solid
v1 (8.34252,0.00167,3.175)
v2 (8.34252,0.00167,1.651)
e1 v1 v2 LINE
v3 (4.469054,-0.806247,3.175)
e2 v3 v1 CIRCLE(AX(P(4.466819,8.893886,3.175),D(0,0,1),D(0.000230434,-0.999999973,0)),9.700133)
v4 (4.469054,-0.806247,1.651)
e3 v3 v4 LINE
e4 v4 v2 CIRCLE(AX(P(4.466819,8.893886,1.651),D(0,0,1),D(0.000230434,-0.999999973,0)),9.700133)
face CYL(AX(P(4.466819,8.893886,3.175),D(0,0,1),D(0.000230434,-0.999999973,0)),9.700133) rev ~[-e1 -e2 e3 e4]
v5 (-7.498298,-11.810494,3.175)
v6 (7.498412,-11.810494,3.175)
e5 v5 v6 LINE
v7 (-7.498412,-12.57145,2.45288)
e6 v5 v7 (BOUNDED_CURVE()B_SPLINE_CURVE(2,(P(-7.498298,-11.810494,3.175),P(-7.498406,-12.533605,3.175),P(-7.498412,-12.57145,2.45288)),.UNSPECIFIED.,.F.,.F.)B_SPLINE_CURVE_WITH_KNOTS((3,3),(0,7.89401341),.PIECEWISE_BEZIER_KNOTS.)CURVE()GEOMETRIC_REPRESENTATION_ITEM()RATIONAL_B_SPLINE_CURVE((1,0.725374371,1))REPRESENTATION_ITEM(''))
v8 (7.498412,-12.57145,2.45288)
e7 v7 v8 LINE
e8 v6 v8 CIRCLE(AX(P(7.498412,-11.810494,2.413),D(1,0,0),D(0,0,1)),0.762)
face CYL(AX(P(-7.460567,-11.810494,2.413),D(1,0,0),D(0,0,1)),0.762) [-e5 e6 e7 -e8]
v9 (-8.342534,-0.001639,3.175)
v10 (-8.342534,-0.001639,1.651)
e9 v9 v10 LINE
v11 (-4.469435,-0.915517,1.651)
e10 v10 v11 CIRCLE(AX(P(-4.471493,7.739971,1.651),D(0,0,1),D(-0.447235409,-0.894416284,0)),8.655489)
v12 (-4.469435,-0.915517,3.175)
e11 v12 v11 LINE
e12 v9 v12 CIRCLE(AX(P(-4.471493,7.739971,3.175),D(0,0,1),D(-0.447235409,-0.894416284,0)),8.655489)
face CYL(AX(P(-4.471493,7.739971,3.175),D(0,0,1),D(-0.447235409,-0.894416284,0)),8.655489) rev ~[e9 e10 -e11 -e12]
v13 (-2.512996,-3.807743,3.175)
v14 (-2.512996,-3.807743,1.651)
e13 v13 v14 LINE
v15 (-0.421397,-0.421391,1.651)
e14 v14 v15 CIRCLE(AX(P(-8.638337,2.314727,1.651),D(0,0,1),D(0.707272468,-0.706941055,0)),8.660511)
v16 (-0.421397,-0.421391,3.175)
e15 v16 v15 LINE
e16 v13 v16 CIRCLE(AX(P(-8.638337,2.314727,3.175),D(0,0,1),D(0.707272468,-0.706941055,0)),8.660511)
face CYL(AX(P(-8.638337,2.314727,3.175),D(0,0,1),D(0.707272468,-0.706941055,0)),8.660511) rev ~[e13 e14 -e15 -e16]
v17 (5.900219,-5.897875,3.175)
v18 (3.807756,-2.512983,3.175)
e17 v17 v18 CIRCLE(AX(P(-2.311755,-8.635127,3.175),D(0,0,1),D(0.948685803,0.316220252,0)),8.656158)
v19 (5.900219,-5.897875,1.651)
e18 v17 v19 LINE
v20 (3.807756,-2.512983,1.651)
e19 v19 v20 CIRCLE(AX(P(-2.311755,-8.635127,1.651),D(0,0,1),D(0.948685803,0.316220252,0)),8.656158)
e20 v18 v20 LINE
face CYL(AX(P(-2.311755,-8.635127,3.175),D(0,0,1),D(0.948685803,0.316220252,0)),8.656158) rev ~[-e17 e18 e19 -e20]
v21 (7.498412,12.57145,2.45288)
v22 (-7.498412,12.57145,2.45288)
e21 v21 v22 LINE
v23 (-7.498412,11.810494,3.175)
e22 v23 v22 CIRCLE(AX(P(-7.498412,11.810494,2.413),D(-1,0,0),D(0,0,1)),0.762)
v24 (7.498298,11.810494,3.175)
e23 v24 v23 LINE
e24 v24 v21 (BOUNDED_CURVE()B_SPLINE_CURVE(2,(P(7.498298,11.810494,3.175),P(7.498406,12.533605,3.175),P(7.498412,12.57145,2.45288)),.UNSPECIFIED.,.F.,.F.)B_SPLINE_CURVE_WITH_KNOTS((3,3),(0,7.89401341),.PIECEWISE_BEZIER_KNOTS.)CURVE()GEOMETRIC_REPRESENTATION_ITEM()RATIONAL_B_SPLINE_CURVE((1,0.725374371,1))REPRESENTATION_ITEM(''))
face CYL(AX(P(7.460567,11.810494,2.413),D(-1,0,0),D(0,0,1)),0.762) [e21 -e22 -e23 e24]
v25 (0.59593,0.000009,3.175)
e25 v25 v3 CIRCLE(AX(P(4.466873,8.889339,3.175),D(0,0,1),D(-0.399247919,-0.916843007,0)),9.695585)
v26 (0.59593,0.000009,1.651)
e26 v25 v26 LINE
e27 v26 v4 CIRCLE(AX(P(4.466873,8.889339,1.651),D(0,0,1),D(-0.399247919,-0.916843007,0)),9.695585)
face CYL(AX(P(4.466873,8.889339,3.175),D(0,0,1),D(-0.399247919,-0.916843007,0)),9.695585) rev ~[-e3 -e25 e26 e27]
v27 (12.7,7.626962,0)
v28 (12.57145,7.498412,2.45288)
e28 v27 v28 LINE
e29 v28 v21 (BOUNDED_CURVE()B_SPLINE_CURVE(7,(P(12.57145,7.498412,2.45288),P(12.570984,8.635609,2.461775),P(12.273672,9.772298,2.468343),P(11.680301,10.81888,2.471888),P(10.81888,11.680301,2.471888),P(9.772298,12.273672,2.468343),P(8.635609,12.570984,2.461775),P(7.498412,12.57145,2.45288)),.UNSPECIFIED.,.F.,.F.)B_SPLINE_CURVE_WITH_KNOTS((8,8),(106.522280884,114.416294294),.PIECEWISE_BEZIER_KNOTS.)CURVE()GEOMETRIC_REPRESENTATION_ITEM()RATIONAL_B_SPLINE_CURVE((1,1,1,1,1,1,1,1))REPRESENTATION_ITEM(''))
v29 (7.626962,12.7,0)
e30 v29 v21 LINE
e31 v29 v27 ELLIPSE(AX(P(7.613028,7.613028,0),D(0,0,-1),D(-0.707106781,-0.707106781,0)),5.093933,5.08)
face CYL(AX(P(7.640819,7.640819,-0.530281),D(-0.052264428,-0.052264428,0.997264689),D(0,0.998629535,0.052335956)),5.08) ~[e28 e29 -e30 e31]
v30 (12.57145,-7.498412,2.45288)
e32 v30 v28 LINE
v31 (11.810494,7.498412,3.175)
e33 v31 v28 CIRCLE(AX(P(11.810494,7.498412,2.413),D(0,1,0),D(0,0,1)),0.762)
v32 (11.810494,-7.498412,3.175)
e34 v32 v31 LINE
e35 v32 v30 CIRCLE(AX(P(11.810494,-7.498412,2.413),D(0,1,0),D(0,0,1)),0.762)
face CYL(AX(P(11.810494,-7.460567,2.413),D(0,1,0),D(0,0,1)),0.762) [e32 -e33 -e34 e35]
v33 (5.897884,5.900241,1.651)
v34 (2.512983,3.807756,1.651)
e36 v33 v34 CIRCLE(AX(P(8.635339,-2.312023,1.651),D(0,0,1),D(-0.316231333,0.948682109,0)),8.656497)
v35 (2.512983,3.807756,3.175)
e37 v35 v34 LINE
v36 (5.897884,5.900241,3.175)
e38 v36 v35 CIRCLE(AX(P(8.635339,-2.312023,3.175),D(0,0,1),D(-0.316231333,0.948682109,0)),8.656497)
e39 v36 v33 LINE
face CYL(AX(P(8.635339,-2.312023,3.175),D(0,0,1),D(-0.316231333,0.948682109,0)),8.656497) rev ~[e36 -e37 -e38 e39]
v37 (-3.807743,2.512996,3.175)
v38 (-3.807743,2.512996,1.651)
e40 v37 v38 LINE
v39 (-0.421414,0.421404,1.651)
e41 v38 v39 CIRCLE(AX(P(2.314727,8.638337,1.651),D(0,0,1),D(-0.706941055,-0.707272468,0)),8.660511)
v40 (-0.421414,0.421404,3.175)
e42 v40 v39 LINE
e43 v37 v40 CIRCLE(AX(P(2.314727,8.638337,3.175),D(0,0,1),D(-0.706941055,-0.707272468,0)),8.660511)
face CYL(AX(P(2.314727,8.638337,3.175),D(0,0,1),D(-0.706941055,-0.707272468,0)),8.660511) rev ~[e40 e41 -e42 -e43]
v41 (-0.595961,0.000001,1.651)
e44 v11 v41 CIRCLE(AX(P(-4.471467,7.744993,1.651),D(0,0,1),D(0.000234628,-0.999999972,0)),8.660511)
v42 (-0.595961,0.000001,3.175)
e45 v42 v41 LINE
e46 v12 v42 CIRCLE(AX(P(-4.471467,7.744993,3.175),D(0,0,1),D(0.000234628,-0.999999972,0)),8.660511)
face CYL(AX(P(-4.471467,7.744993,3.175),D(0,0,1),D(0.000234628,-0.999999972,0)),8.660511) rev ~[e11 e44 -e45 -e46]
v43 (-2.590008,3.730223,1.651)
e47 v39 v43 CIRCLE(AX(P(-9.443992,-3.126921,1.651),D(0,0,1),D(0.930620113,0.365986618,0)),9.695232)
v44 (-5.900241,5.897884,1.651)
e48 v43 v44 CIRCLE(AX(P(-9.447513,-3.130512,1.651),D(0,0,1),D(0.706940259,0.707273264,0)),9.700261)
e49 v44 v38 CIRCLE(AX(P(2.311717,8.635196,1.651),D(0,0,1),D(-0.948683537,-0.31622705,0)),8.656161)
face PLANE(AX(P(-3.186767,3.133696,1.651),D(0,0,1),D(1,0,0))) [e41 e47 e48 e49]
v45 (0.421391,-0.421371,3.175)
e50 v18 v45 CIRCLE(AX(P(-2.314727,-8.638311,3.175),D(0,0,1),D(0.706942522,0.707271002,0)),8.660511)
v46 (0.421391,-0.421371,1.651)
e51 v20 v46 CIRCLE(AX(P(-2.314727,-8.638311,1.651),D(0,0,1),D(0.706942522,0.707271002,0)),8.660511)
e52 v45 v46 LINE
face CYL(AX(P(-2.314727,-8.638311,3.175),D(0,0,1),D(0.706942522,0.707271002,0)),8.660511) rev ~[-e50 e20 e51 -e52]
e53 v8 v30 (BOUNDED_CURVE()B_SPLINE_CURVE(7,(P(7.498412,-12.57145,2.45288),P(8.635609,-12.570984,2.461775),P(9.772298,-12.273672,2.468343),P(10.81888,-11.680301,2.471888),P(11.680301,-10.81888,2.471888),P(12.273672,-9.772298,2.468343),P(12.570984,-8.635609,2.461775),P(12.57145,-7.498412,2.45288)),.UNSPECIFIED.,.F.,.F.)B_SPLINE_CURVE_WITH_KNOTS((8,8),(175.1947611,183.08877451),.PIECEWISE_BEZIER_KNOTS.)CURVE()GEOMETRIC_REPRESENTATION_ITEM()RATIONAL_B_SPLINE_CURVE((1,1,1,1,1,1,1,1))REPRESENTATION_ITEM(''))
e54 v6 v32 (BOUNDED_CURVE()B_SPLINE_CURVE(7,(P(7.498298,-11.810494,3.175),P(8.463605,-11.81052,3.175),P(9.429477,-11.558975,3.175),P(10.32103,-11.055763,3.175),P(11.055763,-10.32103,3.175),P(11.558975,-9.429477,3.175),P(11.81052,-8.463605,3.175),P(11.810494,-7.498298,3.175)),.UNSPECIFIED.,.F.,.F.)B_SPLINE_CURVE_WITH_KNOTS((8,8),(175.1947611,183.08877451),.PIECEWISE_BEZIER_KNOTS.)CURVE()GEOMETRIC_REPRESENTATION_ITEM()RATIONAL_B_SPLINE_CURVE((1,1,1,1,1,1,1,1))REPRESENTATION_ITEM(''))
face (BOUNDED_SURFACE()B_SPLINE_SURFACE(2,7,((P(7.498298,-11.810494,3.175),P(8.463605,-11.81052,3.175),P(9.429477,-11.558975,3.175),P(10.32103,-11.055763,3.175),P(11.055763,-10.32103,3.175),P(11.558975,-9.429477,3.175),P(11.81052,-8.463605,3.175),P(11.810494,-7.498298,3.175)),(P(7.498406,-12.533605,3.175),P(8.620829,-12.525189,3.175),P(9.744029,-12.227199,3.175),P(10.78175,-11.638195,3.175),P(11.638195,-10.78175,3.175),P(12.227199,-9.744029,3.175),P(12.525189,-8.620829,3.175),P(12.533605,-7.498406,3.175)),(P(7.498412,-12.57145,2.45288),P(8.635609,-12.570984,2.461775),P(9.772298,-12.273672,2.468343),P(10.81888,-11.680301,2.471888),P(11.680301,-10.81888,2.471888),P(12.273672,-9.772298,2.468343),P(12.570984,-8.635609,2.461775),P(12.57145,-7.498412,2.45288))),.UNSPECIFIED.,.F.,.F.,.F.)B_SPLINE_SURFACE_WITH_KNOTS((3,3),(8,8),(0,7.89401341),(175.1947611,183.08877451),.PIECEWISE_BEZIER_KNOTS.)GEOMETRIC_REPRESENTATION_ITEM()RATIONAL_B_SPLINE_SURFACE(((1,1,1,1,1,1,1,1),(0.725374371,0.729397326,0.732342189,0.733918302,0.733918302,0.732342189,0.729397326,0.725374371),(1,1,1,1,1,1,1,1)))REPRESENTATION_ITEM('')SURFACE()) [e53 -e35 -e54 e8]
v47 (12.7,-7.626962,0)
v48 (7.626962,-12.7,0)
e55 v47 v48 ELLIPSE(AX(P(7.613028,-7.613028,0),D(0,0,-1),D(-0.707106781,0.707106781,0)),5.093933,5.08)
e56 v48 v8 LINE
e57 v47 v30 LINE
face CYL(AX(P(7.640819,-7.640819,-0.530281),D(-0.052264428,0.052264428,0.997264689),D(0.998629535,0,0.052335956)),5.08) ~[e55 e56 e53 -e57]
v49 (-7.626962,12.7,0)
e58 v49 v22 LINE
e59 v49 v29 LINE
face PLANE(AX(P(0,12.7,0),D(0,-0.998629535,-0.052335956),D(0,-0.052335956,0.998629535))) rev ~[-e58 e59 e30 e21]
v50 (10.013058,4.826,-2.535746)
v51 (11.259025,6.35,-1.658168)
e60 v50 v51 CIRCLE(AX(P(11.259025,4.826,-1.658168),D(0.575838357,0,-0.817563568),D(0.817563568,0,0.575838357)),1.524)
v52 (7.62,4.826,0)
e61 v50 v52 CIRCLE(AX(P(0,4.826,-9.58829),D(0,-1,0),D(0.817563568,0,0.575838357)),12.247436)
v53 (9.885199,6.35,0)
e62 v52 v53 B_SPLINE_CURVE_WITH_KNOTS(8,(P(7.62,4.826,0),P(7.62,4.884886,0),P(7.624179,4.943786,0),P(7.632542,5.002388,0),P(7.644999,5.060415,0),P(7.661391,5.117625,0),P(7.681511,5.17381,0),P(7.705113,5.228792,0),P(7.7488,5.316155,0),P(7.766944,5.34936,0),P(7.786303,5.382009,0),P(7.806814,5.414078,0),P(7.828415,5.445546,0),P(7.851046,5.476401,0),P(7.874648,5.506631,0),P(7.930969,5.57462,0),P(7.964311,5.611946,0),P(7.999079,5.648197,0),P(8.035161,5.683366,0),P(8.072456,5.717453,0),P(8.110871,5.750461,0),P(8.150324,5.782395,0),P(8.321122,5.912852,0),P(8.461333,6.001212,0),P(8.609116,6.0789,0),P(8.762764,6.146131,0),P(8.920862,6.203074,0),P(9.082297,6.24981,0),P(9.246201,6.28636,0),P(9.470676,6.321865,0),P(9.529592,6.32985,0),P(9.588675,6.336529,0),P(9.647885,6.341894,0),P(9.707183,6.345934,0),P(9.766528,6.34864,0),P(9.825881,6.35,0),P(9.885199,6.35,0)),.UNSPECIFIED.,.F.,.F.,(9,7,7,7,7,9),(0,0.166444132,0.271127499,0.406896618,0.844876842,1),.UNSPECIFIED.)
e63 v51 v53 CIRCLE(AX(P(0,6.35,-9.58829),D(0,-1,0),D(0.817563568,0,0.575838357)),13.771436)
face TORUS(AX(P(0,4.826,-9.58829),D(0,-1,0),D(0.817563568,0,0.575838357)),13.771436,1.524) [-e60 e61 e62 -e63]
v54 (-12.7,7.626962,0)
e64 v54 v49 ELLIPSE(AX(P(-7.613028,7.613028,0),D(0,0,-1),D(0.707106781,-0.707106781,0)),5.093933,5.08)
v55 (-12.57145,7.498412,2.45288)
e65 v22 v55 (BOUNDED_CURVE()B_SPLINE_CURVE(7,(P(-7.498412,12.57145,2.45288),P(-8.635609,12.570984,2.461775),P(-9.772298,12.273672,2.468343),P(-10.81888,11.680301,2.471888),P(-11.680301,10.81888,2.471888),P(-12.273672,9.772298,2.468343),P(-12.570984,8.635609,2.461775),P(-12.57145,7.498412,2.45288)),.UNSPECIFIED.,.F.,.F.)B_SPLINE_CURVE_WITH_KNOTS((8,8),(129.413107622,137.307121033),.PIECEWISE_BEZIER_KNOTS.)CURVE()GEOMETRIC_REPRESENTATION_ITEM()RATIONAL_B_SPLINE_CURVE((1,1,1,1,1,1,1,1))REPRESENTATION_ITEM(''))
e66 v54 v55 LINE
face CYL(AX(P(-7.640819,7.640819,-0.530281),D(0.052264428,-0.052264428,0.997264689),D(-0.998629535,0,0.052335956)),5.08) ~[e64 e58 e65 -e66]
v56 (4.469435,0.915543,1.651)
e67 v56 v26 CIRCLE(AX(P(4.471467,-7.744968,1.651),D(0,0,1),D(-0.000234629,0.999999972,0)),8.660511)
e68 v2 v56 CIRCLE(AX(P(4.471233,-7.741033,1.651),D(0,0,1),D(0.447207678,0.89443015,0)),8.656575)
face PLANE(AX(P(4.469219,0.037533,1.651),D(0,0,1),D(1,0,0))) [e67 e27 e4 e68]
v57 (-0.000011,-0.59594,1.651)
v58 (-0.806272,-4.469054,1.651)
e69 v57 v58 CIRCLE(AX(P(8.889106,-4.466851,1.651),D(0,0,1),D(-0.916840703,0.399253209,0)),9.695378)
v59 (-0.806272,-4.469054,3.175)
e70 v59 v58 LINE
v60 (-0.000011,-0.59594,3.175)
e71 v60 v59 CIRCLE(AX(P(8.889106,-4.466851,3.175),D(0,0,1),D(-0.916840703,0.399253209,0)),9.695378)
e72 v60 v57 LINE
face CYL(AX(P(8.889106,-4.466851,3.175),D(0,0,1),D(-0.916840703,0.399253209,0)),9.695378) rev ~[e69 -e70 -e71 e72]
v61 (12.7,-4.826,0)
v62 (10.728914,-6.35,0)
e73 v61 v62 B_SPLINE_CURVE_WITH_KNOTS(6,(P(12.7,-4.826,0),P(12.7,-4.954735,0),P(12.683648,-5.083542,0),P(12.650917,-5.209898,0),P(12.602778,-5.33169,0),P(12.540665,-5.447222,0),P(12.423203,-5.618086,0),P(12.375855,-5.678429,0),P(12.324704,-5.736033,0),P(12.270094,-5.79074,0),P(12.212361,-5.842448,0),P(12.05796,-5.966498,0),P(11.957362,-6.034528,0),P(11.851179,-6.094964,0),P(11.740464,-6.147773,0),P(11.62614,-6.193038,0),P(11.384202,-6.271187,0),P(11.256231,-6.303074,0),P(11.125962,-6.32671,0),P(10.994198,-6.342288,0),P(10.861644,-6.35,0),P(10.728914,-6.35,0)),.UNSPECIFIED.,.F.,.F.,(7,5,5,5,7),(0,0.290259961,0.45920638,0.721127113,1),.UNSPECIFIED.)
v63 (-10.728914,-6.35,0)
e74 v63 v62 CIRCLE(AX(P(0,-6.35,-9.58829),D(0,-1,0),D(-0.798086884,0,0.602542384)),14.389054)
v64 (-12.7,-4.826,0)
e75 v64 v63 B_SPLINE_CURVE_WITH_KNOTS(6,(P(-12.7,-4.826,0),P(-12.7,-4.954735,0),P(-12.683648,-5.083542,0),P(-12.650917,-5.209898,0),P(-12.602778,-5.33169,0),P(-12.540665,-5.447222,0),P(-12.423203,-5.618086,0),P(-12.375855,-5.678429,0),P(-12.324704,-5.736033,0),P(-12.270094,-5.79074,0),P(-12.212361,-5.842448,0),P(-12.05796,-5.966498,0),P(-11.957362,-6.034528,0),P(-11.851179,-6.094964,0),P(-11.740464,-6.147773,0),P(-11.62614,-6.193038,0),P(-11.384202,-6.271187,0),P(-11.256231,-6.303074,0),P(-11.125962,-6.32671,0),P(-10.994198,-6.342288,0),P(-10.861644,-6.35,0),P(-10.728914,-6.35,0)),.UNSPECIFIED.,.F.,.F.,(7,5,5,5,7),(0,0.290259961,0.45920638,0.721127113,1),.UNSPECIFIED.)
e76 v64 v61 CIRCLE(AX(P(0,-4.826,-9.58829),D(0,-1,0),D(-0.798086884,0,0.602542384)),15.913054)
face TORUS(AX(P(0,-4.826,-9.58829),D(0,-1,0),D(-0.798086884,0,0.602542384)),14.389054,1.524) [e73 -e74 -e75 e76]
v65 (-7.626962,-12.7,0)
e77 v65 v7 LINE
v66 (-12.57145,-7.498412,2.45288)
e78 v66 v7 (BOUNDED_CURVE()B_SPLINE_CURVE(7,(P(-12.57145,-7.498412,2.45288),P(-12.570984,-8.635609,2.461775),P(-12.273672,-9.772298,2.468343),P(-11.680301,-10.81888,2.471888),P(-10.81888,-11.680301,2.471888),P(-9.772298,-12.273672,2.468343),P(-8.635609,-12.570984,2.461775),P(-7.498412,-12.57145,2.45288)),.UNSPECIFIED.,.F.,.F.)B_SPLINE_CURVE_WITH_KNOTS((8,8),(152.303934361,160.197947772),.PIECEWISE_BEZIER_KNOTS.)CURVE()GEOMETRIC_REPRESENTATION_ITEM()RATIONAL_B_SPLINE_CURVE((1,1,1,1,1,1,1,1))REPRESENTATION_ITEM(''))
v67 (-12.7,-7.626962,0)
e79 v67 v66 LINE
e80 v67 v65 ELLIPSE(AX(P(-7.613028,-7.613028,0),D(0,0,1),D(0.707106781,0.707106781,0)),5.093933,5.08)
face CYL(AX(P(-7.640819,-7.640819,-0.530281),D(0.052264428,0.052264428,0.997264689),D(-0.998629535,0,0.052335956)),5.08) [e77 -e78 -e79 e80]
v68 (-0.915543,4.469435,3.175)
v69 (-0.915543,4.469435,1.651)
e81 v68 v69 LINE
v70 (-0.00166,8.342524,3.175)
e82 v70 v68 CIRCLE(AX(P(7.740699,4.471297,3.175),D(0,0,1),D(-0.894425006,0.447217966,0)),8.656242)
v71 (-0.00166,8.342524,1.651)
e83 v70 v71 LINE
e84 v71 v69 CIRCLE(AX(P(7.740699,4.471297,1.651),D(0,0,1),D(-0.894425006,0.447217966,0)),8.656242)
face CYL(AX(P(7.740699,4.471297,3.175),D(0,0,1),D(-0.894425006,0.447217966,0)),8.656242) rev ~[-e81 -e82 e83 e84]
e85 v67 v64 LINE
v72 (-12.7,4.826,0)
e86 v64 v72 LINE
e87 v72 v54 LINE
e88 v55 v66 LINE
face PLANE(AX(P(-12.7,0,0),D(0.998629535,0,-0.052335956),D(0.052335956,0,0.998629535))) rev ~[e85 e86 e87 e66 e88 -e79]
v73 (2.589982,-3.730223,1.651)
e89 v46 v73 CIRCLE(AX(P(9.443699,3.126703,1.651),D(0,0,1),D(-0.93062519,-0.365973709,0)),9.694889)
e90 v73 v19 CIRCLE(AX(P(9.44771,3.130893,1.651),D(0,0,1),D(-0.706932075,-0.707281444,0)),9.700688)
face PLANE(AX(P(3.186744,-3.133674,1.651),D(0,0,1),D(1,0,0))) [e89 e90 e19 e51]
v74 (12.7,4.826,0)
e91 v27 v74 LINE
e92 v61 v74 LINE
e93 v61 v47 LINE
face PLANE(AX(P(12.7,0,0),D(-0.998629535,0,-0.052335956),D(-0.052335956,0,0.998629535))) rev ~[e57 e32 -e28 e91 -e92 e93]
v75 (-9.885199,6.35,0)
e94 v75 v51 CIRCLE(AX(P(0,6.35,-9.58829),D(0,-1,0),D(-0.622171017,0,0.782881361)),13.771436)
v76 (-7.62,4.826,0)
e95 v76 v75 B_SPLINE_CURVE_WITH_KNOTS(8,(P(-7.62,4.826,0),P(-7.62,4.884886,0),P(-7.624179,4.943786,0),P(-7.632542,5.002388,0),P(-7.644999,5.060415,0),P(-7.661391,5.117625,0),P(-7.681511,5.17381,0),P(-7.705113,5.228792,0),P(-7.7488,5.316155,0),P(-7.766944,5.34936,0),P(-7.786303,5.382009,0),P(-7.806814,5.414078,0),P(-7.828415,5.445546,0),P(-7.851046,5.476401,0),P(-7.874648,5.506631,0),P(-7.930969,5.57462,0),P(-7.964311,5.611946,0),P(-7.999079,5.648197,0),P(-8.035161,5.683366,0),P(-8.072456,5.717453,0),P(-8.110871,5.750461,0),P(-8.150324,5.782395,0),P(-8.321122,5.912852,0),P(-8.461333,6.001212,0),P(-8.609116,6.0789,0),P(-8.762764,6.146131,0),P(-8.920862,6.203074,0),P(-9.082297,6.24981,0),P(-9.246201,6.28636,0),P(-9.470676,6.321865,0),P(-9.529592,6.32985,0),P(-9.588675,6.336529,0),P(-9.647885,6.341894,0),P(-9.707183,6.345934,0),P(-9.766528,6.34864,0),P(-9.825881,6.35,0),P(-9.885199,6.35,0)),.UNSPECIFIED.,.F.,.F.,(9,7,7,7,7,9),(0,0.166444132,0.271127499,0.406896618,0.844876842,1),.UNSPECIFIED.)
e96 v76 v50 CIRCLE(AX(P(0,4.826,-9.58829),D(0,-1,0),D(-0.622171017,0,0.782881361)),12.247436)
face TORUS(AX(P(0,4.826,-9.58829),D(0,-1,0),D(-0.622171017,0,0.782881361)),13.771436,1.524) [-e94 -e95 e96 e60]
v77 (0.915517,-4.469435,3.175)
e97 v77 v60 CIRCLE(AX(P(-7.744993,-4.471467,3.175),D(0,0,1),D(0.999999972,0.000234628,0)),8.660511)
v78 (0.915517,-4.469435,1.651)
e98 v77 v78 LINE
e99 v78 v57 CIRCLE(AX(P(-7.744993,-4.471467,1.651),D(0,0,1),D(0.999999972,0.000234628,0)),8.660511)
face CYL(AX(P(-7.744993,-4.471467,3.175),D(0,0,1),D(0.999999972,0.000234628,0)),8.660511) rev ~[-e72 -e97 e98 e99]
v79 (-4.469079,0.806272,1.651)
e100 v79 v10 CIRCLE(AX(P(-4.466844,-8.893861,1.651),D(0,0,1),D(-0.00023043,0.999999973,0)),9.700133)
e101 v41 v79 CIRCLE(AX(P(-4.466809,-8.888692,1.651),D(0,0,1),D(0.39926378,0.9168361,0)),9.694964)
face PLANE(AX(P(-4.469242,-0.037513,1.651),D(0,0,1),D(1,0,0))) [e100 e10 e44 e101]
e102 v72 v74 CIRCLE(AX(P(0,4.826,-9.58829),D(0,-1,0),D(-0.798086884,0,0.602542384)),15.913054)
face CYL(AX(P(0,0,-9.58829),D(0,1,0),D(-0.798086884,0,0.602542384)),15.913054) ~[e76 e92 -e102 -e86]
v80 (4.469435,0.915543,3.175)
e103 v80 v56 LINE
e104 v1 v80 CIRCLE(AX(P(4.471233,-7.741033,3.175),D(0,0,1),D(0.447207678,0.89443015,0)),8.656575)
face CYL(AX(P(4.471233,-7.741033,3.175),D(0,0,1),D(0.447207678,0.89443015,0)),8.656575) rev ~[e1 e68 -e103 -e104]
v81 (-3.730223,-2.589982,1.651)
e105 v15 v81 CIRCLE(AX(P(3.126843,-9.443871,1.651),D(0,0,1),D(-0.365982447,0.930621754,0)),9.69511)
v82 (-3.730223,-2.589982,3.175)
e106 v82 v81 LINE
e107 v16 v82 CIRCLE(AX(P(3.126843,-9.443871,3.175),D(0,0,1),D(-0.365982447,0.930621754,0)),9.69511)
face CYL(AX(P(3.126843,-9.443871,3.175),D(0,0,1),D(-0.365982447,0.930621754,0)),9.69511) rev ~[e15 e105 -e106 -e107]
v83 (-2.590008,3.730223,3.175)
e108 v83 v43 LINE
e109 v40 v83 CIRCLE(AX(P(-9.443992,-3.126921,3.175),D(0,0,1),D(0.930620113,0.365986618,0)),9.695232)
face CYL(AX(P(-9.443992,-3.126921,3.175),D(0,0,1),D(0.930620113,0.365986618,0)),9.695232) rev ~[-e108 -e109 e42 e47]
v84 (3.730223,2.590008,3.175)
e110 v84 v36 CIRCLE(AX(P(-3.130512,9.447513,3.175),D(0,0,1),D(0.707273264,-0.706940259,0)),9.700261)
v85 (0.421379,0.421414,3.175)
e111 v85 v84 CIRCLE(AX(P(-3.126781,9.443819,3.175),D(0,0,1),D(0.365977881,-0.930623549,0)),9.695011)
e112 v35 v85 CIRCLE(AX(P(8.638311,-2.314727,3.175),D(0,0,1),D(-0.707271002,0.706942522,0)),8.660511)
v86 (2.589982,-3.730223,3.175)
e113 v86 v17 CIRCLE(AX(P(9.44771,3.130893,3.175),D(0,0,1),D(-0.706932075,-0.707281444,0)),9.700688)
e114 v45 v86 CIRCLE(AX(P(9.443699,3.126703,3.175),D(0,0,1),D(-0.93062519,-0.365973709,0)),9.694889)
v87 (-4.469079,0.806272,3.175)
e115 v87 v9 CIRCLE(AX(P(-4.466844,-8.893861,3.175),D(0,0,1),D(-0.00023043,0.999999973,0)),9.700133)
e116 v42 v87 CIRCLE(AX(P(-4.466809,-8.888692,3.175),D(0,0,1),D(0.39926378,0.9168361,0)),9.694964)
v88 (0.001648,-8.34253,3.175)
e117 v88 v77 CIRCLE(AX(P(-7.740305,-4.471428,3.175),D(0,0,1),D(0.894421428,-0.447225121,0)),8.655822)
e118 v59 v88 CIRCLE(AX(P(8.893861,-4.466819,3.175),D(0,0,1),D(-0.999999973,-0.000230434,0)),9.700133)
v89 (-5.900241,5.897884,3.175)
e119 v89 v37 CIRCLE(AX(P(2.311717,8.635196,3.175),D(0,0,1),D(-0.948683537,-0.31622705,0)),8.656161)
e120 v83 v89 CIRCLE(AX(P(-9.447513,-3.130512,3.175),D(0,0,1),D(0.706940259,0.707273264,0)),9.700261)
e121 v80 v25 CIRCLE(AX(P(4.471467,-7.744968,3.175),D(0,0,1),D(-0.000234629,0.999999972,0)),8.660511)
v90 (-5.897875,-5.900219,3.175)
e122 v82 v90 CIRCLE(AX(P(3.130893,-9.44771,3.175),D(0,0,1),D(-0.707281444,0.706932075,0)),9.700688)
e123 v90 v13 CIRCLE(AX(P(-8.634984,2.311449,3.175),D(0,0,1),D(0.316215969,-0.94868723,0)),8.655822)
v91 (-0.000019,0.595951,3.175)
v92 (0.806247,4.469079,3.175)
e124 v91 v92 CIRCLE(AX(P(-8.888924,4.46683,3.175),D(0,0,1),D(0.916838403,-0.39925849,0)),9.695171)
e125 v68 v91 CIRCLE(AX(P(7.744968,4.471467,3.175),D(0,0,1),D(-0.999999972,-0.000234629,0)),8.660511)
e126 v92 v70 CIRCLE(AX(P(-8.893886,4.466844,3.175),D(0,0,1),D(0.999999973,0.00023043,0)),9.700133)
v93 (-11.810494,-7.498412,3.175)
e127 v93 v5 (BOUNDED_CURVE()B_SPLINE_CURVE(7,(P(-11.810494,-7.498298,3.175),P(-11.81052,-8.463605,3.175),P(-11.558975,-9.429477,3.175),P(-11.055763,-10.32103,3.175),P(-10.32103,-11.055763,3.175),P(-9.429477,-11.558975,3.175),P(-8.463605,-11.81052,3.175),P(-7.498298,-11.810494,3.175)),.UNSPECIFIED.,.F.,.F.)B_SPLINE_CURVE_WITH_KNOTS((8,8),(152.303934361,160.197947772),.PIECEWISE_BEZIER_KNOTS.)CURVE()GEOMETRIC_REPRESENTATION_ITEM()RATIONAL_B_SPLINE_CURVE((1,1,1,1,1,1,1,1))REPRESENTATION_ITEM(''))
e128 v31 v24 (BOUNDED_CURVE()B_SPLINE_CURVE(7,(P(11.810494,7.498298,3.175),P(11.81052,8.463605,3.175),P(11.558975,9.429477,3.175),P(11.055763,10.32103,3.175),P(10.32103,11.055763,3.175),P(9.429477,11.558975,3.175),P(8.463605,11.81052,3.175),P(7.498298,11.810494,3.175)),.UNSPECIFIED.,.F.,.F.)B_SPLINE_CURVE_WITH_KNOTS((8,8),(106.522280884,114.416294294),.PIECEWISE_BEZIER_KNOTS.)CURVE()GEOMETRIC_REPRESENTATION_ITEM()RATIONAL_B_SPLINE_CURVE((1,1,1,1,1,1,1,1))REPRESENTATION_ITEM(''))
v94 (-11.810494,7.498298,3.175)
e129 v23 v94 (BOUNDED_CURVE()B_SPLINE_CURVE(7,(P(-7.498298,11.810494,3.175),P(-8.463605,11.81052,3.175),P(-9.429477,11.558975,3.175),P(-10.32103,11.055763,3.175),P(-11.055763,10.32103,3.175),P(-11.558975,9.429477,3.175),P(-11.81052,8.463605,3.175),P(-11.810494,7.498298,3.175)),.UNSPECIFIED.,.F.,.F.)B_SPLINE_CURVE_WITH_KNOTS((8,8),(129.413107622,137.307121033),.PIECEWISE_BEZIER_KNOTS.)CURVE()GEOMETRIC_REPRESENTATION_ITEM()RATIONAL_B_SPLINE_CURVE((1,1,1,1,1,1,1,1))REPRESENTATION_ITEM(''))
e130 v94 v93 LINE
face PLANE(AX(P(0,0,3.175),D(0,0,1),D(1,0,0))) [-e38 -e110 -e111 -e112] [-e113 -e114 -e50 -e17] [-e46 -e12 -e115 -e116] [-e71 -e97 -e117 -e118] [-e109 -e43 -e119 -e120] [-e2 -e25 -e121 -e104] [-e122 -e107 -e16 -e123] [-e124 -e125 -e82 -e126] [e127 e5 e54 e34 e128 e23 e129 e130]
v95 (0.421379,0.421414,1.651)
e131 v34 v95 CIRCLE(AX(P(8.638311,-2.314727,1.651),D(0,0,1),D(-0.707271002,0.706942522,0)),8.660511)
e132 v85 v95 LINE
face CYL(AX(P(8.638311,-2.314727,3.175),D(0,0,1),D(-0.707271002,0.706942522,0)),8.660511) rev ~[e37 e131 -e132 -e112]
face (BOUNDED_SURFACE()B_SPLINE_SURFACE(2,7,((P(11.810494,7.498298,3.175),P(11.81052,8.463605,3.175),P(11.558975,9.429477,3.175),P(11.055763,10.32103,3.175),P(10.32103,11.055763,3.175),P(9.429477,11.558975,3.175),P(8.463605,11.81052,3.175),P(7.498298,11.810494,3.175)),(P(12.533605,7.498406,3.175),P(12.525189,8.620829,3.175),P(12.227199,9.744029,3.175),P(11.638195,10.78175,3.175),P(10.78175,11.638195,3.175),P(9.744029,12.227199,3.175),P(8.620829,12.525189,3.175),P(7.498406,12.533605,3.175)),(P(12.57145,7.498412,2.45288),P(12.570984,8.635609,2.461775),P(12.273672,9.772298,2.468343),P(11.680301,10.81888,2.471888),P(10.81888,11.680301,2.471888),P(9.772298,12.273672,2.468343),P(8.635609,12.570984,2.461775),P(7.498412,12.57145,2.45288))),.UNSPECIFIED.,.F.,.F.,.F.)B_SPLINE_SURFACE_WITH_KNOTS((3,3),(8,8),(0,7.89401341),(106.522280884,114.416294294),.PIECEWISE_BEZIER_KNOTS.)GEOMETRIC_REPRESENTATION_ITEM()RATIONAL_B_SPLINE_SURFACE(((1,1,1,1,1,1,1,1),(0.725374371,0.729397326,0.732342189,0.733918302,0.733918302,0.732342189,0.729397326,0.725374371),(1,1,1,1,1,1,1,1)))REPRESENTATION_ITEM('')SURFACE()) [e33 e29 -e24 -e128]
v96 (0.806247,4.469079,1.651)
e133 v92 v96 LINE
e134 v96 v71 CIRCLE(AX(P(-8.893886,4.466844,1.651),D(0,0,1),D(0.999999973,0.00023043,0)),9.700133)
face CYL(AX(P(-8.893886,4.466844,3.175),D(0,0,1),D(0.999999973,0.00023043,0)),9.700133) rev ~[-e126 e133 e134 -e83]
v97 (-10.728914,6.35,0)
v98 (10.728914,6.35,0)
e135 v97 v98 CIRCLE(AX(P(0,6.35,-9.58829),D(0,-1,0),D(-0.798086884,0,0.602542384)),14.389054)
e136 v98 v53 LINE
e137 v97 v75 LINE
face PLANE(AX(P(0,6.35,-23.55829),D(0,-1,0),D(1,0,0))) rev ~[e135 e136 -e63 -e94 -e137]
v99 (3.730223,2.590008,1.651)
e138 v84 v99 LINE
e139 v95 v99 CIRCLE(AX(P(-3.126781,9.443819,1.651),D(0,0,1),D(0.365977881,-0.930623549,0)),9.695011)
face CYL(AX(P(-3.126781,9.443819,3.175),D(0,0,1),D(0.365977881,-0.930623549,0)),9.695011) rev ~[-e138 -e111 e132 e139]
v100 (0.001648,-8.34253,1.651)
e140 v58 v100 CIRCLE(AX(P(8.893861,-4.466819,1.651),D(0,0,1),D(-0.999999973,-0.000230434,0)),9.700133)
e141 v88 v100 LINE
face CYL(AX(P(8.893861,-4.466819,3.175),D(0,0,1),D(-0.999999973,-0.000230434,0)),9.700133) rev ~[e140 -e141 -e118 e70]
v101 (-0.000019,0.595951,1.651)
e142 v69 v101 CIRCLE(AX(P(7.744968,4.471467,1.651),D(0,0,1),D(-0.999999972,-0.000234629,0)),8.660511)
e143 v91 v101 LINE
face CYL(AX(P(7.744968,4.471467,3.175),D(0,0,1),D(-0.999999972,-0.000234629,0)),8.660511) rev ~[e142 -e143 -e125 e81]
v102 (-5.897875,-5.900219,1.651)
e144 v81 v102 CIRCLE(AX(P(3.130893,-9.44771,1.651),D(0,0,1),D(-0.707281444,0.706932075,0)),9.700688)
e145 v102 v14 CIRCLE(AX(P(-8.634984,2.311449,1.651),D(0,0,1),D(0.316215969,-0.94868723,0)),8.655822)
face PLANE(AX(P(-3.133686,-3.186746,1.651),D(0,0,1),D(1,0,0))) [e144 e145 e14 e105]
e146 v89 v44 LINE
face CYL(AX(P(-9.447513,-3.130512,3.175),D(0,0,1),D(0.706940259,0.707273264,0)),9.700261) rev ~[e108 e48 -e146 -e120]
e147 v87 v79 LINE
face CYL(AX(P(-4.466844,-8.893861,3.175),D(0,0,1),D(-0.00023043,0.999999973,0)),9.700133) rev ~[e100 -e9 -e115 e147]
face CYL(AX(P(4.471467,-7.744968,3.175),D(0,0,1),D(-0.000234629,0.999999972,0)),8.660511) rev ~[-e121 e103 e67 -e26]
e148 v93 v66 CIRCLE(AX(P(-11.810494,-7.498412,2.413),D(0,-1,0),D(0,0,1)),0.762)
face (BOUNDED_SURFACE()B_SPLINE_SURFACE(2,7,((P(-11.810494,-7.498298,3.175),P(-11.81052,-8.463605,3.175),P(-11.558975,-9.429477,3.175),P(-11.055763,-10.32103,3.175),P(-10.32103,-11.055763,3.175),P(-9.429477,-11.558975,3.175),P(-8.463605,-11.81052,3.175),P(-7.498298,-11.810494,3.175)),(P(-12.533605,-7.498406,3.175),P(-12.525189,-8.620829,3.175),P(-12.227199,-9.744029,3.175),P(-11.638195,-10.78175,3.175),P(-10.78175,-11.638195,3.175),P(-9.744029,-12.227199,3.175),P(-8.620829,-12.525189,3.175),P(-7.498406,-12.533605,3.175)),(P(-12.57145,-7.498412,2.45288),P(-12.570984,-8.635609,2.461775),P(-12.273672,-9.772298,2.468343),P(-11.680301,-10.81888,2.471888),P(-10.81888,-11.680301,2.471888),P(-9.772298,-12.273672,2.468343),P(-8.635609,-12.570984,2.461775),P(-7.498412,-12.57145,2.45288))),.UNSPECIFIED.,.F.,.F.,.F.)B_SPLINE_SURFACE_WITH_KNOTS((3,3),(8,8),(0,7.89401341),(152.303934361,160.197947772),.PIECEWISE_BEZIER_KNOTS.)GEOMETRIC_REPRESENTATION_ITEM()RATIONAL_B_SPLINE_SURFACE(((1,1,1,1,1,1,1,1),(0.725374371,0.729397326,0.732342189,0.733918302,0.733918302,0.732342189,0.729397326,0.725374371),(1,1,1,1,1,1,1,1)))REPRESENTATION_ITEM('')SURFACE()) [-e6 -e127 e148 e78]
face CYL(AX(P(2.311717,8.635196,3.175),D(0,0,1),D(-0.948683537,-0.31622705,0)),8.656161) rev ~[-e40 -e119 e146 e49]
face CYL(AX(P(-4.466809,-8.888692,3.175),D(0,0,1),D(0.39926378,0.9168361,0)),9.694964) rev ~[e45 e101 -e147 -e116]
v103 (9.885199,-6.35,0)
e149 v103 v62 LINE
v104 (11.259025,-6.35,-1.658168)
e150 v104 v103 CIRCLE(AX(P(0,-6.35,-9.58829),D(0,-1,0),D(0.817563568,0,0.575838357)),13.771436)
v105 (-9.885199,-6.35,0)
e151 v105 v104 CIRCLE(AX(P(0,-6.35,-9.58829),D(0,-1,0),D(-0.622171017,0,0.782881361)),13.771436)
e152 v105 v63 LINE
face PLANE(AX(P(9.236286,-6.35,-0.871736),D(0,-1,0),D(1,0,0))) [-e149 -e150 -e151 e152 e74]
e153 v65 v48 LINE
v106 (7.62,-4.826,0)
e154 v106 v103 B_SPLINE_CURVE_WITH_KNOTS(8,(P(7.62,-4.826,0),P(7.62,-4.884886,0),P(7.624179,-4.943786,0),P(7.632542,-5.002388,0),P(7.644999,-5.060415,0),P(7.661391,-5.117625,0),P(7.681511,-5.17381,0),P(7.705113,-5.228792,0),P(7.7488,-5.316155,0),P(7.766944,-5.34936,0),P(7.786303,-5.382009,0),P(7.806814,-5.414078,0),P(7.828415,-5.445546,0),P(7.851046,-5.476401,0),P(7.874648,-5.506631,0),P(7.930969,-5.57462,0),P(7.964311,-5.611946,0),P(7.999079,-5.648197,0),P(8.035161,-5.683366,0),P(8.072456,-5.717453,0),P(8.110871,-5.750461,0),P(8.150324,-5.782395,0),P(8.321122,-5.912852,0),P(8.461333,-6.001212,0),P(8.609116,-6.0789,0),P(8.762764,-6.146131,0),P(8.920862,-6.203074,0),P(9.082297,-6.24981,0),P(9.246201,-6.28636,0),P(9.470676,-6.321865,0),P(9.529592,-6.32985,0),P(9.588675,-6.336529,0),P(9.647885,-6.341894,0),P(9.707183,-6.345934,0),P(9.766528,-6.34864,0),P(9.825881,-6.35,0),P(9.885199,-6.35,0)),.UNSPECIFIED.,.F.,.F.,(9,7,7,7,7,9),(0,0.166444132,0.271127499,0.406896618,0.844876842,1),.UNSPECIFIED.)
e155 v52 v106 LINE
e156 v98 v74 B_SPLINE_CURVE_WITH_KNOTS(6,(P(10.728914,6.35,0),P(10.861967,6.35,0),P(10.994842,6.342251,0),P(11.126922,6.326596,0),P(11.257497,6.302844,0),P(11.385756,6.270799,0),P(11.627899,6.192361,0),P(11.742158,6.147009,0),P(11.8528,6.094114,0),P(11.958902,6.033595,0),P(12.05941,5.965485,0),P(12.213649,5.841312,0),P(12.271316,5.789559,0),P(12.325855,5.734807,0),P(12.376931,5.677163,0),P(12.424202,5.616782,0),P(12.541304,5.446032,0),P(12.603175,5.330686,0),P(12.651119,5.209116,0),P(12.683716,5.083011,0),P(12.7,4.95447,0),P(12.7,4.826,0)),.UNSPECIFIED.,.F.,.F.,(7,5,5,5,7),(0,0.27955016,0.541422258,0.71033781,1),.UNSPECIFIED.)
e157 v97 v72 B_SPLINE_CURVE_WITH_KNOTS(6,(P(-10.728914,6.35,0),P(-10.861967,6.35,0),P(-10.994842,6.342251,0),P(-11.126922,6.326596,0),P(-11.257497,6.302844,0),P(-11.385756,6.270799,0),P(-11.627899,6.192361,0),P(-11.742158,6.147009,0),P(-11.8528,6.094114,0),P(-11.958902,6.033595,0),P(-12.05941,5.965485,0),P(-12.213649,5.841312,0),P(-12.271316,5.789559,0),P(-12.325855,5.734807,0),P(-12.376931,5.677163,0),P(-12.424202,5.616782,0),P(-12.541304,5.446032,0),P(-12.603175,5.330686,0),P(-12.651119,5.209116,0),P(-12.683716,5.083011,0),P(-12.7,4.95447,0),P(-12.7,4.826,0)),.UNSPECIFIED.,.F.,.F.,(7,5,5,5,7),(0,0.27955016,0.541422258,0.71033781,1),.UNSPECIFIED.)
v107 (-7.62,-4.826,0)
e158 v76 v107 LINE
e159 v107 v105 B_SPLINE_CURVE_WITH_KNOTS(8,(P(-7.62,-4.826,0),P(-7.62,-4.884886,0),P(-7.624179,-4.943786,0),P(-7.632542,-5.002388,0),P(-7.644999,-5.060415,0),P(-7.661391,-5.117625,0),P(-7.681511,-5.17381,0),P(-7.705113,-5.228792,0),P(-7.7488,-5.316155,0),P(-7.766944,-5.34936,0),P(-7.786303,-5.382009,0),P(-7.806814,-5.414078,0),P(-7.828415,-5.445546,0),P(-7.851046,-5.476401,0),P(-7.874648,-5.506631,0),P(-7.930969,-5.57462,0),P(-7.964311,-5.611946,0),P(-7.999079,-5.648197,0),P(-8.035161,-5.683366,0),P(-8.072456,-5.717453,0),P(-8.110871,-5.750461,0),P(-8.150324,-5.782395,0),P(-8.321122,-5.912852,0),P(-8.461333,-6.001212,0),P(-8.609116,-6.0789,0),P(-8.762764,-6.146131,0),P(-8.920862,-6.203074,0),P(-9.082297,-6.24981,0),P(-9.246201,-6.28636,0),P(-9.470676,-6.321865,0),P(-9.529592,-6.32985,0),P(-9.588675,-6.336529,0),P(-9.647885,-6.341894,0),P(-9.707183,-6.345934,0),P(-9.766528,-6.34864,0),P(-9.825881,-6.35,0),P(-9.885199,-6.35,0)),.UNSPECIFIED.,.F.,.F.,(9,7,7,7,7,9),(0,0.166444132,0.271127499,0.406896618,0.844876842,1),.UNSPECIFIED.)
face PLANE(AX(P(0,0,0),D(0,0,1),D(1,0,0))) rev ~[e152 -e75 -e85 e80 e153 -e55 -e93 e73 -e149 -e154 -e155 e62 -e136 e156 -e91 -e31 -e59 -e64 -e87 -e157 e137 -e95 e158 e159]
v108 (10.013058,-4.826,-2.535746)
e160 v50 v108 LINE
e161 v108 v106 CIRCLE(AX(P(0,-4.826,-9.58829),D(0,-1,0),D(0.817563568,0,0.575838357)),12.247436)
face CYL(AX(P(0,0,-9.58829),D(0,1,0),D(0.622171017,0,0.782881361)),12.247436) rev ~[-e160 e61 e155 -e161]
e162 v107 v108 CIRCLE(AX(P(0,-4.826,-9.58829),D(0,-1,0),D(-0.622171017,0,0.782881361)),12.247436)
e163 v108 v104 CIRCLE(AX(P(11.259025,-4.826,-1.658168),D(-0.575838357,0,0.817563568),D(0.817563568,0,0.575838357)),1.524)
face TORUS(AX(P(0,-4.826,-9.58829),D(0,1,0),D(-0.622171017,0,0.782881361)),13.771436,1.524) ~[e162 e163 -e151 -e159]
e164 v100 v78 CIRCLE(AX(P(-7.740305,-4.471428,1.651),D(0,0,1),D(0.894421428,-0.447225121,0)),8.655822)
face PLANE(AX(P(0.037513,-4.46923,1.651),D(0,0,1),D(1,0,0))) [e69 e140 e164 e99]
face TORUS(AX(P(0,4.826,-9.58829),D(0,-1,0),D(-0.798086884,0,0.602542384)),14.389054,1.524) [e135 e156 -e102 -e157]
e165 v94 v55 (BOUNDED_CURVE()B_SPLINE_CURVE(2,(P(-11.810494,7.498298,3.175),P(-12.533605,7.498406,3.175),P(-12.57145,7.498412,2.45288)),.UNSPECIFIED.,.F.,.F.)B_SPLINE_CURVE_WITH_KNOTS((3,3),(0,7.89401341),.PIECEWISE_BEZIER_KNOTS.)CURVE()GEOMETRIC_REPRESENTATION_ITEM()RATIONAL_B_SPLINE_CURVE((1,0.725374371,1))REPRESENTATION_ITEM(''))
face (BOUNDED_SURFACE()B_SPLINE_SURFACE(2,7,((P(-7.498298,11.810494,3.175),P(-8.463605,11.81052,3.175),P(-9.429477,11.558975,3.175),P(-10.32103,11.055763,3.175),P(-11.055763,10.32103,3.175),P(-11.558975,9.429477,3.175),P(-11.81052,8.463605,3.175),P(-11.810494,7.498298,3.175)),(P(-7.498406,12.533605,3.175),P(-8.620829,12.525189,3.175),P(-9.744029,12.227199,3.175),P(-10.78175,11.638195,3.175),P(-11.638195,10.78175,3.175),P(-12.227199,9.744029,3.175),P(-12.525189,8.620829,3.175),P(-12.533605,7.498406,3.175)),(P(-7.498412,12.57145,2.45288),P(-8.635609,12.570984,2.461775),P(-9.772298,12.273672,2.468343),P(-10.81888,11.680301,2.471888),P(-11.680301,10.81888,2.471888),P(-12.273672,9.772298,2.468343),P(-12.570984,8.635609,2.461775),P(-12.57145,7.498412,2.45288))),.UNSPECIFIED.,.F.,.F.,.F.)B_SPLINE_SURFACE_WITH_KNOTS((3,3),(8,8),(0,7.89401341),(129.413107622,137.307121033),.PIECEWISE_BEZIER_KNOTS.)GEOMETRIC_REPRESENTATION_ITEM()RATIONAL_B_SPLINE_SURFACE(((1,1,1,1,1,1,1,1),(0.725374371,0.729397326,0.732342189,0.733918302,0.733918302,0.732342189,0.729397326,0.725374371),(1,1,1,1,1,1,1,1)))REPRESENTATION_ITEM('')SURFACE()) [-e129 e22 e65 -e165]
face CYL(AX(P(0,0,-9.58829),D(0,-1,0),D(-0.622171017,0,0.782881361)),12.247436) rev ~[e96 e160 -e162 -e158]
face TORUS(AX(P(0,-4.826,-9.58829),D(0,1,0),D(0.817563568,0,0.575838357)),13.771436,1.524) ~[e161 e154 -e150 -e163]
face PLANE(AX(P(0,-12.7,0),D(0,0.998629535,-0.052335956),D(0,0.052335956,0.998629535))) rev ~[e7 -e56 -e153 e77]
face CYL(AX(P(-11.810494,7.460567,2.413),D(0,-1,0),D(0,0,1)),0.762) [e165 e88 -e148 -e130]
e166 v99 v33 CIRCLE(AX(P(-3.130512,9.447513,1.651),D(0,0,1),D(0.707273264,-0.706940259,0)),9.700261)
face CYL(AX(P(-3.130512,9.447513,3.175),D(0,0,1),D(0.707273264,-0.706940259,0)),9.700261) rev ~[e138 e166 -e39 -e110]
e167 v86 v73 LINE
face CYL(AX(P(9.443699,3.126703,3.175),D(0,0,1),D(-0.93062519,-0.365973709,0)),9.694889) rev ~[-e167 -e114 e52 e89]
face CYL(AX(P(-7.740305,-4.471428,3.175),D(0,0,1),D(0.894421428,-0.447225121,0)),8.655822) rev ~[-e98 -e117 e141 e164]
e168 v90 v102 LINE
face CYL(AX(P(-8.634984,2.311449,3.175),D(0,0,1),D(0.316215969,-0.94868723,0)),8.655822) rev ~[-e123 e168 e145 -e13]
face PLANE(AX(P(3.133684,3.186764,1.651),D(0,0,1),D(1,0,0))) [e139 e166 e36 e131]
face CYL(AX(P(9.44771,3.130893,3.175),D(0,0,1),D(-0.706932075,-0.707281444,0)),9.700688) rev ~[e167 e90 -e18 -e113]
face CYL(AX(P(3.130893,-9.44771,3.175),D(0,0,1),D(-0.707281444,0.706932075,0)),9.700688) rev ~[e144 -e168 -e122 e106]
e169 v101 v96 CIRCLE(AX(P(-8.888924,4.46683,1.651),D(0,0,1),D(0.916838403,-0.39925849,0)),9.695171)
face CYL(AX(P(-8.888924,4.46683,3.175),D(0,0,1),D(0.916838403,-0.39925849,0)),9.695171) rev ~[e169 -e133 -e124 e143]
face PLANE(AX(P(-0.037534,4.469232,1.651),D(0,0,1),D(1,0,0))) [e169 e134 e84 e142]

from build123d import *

# Parameters (mm, degrees)
F0_W          = 25.4
F0_H          = 25.4
F1_DEPTH      = 3.175
F1_TAPER      = 3
F3_W          = 5.08
F3_H          = 12.7
F6_DEPTH      = 6.35
F6_DEPTH_BACK = 6.35
F7_R          = 5.08
F8_R          = 1.524
F9_R          = 0.762
F11_DEPTH     = 1.524


# Not quite as in the source:
# - ends of sketch curves that miss each other by under 0.0002 mm in the source are joined


with BuildPart() as f1:
    # F0 (on Top) → F1 (new body)
    with BuildSketch(Plane.XY):
        Rectangle(F0_W, F0_H)
    extrude(amount=F1_DEPTH, taper=F1_TAPER)

    # F4: sweep along a path in F2
    with BuildLine(Plane.XZ) as f4_path:
        ThreePointArc((-10.16, 0), (0, -23.5582897328), (10.16, 0))
    # F3 (on face) → F4 (sweep)
    with BuildSketch(Plane(origin=(0, 0, 0), x_dir=(1, 0, 0), z_dir=(0, 0, -1))):
        with Locations((-10.16, 0)):
            Rectangle(F3_W, F3_H)
    sweep(path=f4_path.line)

    # F5 (on Front) → F6 (join, two sides)
    with BuildSketch(Plane.XZ) as f6_sk:
        with BuildLine():
            ThreePointArc((7.62, 0), (8.9072265211, -1.1822790439), (10.0130578512, -2.535746045))
            Line((10.0130578512, -2.535746045), (10.16, 0))
            Line((10.16, 0), (7.62, 0))
        make_face()
    extrude(amount=F6_DEPTH)
    extrude(f6_sk.sketch, amount=-F6_DEPTH_BACK)

    # F7
    f7_edges = [f1.edges().sort_by_distance(p)[0] for p in [
        (-12.616803, 12.616803, 1.5875),
        (-12.616803, -12.616803, 1.5875),
        (12.616803, -12.616803, 1.5875),
        (12.616803, 12.616803, 1.5875),
    ]]
    fillet(f7_edges, radius=F7_R)

    # F8
    f8_edges = [f1.edges().sort_by_distance(p)[0] for p in [
        (-1.743325, -6.35, -21.711017),
        (8.907227, -6.35, -1.182279),
        (-1.743325, 6.35, -21.711017),
        (0, -6.35, -25.501344),
        (0, 6.35, -25.501344),
        (8.907227, 6.35, -1.182279),
    ]]
    fillet(f8_edges, radius=F8_R)

    # F9
    f9_edges = [f1.edges().sort_by_distance(p)[0] for p in [
        (12.533605, 0, 3.175),
        (11.048589, -11.048589, 3.175),
        (11.048589, 11.048589, 3.175),
        (0, -12.533605, 3.175),
        (0, 12.533605, 3.175),
        (-11.048589, -11.048589, 3.175),
        (-11.048589, 11.048589, 3.175),
        (-12.533605, 0, 3.175),
    ]]
    fillet(f9_edges, radius=F9_R)

    # F10 (on face) → F11 (cut)
    with BuildSketch(Plane.XY.offset(3.175)):
        with BuildLine():
            ThreePointArc((-0.9155427616, 4.4694347941), (-0.6833212656, 2.4793847644), (-1.9106e-05, 0.5959506396))
            ThreePointArc((-1.9106e-05, 0.5959506396), (0.6027711391, 2.4909604876), (0.8062465423, 4.4690791999))
            ThreePointArc((0.8062465423, 4.4690791999), (0.6018941572, 6.4474337167), (-0.0016602711, 8.3425243592))
            ThreePointArc((-0.0016602711, 8.3425243592), (-0.6841876238, 6.4592135153), (-0.9155427616, 4.4694347941))
        make_face()
        with BuildLine():
            ThreePointArc((-3.8077433876, 2.5129958106), (-2.2363648369, 1.2700255802), (-0.4214138117, 0.4214041575))
            ThreePointArc((-0.4214138117, 0.4214041575), (-1.3351477858, 2.1876037686), (-2.5900078566, 3.7302233456))
            ThreePointArc((-2.5900078566, 3.7302233456), (-4.1334248315, 4.984630209), (-5.9002408115, 5.8978835339))
            ThreePointArc((-5.9002408115, 5.8978835339), (-5.0511449244, 4.0835594737), (-3.8077433876, 2.5129958106))
        make_face()
        with BuildLine():
            ThreePointArc((2.5129831047, 3.8077560876), (1.2700048982, 2.2363724755), (0.4213787575, 0.4214138117))
            ThreePointArc((0.4213787575, 0.4214138117), (2.1875938836, 1.3351413072), (3.7302233456, 2.5900078566))
            ThreePointArc((3.7302233456, 2.5900078566), (4.984630209, 4.1334248315), (5.8978835339, 5.9002408115))
            ThreePointArc((5.8978835339, 5.9002408115), (4.0835594737, 5.0511449244), (2.5129831047, 3.8077560876))
        make_face()
        with BuildLine():
            ThreePointArc((-4.4694348001, -0.9155173616), (-2.4793902981, -0.6832971735), (-0.5959608043, 1.2077e-06))
            ThreePointArc((-0.5959608043, 1.2077e-06), (-2.4909555235, 0.6027955057), (-4.4690791999, 0.8062719423))
            ThreePointArc((-4.4690791999, 0.8062719423), (-6.4474386841, 0.6019185211), (-8.3425336625, -0.0016389259))
            ThreePointArc((-8.3425336625, -0.0016389259), (-6.4592135153, -0.6841876238), (-4.4694348001, -0.9155173616))
        make_face()
        with BuildLine():
            ThreePointArc((-2.5129958106, -3.8077433876), (-1.2700192482, -2.2363545852), (-0.4213965439, -0.4213909469))
            ThreePointArc((-0.4213965439, -0.4213909469), (-2.1876037686, -1.3351223858), (-3.7302233456, -2.5899824566))
            ThreePointArc((-3.7302233456, -2.5899824566), (-4.9846188126, -4.1334074282), (-5.8978748887, -5.9002188082))
            ThreePointArc((-5.8978748887, -5.9002188082), (-4.0835560578, -5.0511428128), (-2.5129958106, -3.8077433876))
        make_face()
        with BuildLine():
            ThreePointArc((0.9155173616, -4.4694348001), (0.6832945611, -2.4793792452), (-1.13725e-05, -0.5959404907))
            ThreePointArc((-1.13725e-05, -0.5959404907), (-0.6027905445, -2.4909316905), (-0.8062719482, -4.4690537999))
            ThreePointArc((-0.8062719482, -4.4690537999), (-0.601916144, -6.447424681), (0.0016482293, -8.3425296076))
            ThreePointArc((0.0016482293, -8.3425296076), (0.6841820987, -6.4592115314), (0.9155173616, -4.4694348001))
        make_face()
        with BuildLine():
            ThreePointArc((3.8077560876, -2.5129831047), (2.2363622238, -1.2699985662), (0.4213909469, -0.4213711439))
            ThreePointArc((0.4213909469, -0.4213711439), (1.3351159072, -2.1875938836), (2.5899824566, -3.7302233456))
            ThreePointArc((2.5899824566, -3.7302233456), (4.1334074282, -4.9846188126), (5.9002188082, -5.8978748887))
            ThreePointArc((5.9002188082, -5.8978748887), (5.0511428128, -4.0835560578), (3.8077560876, -2.5129831047))
        make_face()
        with BuildLine():
            ThreePointArc((4.4694347941, 0.9155427616), (2.4793737115, 0.6833186532), (0.5959303259, 8.9412e-06))
            ThreePointArc((0.5959303259, 8.9412e-06), (2.4909366547, -0.6027661778), (4.4690537999, -0.8062465482))
            ThreePointArc((4.4690537999, -0.8062465482), (6.4474197136, -0.6018917801), (8.3425203043, 0.0016695744))
            ThreePointArc((8.3425203043, 0.0016695744), (6.4592115314, 0.6841820987), (4.4694347941, 0.9155427616))
        make_face()
    extrude(amount=-F11_DEPTH, mode=Mode.SUBTRACT)


solid = f1.part
